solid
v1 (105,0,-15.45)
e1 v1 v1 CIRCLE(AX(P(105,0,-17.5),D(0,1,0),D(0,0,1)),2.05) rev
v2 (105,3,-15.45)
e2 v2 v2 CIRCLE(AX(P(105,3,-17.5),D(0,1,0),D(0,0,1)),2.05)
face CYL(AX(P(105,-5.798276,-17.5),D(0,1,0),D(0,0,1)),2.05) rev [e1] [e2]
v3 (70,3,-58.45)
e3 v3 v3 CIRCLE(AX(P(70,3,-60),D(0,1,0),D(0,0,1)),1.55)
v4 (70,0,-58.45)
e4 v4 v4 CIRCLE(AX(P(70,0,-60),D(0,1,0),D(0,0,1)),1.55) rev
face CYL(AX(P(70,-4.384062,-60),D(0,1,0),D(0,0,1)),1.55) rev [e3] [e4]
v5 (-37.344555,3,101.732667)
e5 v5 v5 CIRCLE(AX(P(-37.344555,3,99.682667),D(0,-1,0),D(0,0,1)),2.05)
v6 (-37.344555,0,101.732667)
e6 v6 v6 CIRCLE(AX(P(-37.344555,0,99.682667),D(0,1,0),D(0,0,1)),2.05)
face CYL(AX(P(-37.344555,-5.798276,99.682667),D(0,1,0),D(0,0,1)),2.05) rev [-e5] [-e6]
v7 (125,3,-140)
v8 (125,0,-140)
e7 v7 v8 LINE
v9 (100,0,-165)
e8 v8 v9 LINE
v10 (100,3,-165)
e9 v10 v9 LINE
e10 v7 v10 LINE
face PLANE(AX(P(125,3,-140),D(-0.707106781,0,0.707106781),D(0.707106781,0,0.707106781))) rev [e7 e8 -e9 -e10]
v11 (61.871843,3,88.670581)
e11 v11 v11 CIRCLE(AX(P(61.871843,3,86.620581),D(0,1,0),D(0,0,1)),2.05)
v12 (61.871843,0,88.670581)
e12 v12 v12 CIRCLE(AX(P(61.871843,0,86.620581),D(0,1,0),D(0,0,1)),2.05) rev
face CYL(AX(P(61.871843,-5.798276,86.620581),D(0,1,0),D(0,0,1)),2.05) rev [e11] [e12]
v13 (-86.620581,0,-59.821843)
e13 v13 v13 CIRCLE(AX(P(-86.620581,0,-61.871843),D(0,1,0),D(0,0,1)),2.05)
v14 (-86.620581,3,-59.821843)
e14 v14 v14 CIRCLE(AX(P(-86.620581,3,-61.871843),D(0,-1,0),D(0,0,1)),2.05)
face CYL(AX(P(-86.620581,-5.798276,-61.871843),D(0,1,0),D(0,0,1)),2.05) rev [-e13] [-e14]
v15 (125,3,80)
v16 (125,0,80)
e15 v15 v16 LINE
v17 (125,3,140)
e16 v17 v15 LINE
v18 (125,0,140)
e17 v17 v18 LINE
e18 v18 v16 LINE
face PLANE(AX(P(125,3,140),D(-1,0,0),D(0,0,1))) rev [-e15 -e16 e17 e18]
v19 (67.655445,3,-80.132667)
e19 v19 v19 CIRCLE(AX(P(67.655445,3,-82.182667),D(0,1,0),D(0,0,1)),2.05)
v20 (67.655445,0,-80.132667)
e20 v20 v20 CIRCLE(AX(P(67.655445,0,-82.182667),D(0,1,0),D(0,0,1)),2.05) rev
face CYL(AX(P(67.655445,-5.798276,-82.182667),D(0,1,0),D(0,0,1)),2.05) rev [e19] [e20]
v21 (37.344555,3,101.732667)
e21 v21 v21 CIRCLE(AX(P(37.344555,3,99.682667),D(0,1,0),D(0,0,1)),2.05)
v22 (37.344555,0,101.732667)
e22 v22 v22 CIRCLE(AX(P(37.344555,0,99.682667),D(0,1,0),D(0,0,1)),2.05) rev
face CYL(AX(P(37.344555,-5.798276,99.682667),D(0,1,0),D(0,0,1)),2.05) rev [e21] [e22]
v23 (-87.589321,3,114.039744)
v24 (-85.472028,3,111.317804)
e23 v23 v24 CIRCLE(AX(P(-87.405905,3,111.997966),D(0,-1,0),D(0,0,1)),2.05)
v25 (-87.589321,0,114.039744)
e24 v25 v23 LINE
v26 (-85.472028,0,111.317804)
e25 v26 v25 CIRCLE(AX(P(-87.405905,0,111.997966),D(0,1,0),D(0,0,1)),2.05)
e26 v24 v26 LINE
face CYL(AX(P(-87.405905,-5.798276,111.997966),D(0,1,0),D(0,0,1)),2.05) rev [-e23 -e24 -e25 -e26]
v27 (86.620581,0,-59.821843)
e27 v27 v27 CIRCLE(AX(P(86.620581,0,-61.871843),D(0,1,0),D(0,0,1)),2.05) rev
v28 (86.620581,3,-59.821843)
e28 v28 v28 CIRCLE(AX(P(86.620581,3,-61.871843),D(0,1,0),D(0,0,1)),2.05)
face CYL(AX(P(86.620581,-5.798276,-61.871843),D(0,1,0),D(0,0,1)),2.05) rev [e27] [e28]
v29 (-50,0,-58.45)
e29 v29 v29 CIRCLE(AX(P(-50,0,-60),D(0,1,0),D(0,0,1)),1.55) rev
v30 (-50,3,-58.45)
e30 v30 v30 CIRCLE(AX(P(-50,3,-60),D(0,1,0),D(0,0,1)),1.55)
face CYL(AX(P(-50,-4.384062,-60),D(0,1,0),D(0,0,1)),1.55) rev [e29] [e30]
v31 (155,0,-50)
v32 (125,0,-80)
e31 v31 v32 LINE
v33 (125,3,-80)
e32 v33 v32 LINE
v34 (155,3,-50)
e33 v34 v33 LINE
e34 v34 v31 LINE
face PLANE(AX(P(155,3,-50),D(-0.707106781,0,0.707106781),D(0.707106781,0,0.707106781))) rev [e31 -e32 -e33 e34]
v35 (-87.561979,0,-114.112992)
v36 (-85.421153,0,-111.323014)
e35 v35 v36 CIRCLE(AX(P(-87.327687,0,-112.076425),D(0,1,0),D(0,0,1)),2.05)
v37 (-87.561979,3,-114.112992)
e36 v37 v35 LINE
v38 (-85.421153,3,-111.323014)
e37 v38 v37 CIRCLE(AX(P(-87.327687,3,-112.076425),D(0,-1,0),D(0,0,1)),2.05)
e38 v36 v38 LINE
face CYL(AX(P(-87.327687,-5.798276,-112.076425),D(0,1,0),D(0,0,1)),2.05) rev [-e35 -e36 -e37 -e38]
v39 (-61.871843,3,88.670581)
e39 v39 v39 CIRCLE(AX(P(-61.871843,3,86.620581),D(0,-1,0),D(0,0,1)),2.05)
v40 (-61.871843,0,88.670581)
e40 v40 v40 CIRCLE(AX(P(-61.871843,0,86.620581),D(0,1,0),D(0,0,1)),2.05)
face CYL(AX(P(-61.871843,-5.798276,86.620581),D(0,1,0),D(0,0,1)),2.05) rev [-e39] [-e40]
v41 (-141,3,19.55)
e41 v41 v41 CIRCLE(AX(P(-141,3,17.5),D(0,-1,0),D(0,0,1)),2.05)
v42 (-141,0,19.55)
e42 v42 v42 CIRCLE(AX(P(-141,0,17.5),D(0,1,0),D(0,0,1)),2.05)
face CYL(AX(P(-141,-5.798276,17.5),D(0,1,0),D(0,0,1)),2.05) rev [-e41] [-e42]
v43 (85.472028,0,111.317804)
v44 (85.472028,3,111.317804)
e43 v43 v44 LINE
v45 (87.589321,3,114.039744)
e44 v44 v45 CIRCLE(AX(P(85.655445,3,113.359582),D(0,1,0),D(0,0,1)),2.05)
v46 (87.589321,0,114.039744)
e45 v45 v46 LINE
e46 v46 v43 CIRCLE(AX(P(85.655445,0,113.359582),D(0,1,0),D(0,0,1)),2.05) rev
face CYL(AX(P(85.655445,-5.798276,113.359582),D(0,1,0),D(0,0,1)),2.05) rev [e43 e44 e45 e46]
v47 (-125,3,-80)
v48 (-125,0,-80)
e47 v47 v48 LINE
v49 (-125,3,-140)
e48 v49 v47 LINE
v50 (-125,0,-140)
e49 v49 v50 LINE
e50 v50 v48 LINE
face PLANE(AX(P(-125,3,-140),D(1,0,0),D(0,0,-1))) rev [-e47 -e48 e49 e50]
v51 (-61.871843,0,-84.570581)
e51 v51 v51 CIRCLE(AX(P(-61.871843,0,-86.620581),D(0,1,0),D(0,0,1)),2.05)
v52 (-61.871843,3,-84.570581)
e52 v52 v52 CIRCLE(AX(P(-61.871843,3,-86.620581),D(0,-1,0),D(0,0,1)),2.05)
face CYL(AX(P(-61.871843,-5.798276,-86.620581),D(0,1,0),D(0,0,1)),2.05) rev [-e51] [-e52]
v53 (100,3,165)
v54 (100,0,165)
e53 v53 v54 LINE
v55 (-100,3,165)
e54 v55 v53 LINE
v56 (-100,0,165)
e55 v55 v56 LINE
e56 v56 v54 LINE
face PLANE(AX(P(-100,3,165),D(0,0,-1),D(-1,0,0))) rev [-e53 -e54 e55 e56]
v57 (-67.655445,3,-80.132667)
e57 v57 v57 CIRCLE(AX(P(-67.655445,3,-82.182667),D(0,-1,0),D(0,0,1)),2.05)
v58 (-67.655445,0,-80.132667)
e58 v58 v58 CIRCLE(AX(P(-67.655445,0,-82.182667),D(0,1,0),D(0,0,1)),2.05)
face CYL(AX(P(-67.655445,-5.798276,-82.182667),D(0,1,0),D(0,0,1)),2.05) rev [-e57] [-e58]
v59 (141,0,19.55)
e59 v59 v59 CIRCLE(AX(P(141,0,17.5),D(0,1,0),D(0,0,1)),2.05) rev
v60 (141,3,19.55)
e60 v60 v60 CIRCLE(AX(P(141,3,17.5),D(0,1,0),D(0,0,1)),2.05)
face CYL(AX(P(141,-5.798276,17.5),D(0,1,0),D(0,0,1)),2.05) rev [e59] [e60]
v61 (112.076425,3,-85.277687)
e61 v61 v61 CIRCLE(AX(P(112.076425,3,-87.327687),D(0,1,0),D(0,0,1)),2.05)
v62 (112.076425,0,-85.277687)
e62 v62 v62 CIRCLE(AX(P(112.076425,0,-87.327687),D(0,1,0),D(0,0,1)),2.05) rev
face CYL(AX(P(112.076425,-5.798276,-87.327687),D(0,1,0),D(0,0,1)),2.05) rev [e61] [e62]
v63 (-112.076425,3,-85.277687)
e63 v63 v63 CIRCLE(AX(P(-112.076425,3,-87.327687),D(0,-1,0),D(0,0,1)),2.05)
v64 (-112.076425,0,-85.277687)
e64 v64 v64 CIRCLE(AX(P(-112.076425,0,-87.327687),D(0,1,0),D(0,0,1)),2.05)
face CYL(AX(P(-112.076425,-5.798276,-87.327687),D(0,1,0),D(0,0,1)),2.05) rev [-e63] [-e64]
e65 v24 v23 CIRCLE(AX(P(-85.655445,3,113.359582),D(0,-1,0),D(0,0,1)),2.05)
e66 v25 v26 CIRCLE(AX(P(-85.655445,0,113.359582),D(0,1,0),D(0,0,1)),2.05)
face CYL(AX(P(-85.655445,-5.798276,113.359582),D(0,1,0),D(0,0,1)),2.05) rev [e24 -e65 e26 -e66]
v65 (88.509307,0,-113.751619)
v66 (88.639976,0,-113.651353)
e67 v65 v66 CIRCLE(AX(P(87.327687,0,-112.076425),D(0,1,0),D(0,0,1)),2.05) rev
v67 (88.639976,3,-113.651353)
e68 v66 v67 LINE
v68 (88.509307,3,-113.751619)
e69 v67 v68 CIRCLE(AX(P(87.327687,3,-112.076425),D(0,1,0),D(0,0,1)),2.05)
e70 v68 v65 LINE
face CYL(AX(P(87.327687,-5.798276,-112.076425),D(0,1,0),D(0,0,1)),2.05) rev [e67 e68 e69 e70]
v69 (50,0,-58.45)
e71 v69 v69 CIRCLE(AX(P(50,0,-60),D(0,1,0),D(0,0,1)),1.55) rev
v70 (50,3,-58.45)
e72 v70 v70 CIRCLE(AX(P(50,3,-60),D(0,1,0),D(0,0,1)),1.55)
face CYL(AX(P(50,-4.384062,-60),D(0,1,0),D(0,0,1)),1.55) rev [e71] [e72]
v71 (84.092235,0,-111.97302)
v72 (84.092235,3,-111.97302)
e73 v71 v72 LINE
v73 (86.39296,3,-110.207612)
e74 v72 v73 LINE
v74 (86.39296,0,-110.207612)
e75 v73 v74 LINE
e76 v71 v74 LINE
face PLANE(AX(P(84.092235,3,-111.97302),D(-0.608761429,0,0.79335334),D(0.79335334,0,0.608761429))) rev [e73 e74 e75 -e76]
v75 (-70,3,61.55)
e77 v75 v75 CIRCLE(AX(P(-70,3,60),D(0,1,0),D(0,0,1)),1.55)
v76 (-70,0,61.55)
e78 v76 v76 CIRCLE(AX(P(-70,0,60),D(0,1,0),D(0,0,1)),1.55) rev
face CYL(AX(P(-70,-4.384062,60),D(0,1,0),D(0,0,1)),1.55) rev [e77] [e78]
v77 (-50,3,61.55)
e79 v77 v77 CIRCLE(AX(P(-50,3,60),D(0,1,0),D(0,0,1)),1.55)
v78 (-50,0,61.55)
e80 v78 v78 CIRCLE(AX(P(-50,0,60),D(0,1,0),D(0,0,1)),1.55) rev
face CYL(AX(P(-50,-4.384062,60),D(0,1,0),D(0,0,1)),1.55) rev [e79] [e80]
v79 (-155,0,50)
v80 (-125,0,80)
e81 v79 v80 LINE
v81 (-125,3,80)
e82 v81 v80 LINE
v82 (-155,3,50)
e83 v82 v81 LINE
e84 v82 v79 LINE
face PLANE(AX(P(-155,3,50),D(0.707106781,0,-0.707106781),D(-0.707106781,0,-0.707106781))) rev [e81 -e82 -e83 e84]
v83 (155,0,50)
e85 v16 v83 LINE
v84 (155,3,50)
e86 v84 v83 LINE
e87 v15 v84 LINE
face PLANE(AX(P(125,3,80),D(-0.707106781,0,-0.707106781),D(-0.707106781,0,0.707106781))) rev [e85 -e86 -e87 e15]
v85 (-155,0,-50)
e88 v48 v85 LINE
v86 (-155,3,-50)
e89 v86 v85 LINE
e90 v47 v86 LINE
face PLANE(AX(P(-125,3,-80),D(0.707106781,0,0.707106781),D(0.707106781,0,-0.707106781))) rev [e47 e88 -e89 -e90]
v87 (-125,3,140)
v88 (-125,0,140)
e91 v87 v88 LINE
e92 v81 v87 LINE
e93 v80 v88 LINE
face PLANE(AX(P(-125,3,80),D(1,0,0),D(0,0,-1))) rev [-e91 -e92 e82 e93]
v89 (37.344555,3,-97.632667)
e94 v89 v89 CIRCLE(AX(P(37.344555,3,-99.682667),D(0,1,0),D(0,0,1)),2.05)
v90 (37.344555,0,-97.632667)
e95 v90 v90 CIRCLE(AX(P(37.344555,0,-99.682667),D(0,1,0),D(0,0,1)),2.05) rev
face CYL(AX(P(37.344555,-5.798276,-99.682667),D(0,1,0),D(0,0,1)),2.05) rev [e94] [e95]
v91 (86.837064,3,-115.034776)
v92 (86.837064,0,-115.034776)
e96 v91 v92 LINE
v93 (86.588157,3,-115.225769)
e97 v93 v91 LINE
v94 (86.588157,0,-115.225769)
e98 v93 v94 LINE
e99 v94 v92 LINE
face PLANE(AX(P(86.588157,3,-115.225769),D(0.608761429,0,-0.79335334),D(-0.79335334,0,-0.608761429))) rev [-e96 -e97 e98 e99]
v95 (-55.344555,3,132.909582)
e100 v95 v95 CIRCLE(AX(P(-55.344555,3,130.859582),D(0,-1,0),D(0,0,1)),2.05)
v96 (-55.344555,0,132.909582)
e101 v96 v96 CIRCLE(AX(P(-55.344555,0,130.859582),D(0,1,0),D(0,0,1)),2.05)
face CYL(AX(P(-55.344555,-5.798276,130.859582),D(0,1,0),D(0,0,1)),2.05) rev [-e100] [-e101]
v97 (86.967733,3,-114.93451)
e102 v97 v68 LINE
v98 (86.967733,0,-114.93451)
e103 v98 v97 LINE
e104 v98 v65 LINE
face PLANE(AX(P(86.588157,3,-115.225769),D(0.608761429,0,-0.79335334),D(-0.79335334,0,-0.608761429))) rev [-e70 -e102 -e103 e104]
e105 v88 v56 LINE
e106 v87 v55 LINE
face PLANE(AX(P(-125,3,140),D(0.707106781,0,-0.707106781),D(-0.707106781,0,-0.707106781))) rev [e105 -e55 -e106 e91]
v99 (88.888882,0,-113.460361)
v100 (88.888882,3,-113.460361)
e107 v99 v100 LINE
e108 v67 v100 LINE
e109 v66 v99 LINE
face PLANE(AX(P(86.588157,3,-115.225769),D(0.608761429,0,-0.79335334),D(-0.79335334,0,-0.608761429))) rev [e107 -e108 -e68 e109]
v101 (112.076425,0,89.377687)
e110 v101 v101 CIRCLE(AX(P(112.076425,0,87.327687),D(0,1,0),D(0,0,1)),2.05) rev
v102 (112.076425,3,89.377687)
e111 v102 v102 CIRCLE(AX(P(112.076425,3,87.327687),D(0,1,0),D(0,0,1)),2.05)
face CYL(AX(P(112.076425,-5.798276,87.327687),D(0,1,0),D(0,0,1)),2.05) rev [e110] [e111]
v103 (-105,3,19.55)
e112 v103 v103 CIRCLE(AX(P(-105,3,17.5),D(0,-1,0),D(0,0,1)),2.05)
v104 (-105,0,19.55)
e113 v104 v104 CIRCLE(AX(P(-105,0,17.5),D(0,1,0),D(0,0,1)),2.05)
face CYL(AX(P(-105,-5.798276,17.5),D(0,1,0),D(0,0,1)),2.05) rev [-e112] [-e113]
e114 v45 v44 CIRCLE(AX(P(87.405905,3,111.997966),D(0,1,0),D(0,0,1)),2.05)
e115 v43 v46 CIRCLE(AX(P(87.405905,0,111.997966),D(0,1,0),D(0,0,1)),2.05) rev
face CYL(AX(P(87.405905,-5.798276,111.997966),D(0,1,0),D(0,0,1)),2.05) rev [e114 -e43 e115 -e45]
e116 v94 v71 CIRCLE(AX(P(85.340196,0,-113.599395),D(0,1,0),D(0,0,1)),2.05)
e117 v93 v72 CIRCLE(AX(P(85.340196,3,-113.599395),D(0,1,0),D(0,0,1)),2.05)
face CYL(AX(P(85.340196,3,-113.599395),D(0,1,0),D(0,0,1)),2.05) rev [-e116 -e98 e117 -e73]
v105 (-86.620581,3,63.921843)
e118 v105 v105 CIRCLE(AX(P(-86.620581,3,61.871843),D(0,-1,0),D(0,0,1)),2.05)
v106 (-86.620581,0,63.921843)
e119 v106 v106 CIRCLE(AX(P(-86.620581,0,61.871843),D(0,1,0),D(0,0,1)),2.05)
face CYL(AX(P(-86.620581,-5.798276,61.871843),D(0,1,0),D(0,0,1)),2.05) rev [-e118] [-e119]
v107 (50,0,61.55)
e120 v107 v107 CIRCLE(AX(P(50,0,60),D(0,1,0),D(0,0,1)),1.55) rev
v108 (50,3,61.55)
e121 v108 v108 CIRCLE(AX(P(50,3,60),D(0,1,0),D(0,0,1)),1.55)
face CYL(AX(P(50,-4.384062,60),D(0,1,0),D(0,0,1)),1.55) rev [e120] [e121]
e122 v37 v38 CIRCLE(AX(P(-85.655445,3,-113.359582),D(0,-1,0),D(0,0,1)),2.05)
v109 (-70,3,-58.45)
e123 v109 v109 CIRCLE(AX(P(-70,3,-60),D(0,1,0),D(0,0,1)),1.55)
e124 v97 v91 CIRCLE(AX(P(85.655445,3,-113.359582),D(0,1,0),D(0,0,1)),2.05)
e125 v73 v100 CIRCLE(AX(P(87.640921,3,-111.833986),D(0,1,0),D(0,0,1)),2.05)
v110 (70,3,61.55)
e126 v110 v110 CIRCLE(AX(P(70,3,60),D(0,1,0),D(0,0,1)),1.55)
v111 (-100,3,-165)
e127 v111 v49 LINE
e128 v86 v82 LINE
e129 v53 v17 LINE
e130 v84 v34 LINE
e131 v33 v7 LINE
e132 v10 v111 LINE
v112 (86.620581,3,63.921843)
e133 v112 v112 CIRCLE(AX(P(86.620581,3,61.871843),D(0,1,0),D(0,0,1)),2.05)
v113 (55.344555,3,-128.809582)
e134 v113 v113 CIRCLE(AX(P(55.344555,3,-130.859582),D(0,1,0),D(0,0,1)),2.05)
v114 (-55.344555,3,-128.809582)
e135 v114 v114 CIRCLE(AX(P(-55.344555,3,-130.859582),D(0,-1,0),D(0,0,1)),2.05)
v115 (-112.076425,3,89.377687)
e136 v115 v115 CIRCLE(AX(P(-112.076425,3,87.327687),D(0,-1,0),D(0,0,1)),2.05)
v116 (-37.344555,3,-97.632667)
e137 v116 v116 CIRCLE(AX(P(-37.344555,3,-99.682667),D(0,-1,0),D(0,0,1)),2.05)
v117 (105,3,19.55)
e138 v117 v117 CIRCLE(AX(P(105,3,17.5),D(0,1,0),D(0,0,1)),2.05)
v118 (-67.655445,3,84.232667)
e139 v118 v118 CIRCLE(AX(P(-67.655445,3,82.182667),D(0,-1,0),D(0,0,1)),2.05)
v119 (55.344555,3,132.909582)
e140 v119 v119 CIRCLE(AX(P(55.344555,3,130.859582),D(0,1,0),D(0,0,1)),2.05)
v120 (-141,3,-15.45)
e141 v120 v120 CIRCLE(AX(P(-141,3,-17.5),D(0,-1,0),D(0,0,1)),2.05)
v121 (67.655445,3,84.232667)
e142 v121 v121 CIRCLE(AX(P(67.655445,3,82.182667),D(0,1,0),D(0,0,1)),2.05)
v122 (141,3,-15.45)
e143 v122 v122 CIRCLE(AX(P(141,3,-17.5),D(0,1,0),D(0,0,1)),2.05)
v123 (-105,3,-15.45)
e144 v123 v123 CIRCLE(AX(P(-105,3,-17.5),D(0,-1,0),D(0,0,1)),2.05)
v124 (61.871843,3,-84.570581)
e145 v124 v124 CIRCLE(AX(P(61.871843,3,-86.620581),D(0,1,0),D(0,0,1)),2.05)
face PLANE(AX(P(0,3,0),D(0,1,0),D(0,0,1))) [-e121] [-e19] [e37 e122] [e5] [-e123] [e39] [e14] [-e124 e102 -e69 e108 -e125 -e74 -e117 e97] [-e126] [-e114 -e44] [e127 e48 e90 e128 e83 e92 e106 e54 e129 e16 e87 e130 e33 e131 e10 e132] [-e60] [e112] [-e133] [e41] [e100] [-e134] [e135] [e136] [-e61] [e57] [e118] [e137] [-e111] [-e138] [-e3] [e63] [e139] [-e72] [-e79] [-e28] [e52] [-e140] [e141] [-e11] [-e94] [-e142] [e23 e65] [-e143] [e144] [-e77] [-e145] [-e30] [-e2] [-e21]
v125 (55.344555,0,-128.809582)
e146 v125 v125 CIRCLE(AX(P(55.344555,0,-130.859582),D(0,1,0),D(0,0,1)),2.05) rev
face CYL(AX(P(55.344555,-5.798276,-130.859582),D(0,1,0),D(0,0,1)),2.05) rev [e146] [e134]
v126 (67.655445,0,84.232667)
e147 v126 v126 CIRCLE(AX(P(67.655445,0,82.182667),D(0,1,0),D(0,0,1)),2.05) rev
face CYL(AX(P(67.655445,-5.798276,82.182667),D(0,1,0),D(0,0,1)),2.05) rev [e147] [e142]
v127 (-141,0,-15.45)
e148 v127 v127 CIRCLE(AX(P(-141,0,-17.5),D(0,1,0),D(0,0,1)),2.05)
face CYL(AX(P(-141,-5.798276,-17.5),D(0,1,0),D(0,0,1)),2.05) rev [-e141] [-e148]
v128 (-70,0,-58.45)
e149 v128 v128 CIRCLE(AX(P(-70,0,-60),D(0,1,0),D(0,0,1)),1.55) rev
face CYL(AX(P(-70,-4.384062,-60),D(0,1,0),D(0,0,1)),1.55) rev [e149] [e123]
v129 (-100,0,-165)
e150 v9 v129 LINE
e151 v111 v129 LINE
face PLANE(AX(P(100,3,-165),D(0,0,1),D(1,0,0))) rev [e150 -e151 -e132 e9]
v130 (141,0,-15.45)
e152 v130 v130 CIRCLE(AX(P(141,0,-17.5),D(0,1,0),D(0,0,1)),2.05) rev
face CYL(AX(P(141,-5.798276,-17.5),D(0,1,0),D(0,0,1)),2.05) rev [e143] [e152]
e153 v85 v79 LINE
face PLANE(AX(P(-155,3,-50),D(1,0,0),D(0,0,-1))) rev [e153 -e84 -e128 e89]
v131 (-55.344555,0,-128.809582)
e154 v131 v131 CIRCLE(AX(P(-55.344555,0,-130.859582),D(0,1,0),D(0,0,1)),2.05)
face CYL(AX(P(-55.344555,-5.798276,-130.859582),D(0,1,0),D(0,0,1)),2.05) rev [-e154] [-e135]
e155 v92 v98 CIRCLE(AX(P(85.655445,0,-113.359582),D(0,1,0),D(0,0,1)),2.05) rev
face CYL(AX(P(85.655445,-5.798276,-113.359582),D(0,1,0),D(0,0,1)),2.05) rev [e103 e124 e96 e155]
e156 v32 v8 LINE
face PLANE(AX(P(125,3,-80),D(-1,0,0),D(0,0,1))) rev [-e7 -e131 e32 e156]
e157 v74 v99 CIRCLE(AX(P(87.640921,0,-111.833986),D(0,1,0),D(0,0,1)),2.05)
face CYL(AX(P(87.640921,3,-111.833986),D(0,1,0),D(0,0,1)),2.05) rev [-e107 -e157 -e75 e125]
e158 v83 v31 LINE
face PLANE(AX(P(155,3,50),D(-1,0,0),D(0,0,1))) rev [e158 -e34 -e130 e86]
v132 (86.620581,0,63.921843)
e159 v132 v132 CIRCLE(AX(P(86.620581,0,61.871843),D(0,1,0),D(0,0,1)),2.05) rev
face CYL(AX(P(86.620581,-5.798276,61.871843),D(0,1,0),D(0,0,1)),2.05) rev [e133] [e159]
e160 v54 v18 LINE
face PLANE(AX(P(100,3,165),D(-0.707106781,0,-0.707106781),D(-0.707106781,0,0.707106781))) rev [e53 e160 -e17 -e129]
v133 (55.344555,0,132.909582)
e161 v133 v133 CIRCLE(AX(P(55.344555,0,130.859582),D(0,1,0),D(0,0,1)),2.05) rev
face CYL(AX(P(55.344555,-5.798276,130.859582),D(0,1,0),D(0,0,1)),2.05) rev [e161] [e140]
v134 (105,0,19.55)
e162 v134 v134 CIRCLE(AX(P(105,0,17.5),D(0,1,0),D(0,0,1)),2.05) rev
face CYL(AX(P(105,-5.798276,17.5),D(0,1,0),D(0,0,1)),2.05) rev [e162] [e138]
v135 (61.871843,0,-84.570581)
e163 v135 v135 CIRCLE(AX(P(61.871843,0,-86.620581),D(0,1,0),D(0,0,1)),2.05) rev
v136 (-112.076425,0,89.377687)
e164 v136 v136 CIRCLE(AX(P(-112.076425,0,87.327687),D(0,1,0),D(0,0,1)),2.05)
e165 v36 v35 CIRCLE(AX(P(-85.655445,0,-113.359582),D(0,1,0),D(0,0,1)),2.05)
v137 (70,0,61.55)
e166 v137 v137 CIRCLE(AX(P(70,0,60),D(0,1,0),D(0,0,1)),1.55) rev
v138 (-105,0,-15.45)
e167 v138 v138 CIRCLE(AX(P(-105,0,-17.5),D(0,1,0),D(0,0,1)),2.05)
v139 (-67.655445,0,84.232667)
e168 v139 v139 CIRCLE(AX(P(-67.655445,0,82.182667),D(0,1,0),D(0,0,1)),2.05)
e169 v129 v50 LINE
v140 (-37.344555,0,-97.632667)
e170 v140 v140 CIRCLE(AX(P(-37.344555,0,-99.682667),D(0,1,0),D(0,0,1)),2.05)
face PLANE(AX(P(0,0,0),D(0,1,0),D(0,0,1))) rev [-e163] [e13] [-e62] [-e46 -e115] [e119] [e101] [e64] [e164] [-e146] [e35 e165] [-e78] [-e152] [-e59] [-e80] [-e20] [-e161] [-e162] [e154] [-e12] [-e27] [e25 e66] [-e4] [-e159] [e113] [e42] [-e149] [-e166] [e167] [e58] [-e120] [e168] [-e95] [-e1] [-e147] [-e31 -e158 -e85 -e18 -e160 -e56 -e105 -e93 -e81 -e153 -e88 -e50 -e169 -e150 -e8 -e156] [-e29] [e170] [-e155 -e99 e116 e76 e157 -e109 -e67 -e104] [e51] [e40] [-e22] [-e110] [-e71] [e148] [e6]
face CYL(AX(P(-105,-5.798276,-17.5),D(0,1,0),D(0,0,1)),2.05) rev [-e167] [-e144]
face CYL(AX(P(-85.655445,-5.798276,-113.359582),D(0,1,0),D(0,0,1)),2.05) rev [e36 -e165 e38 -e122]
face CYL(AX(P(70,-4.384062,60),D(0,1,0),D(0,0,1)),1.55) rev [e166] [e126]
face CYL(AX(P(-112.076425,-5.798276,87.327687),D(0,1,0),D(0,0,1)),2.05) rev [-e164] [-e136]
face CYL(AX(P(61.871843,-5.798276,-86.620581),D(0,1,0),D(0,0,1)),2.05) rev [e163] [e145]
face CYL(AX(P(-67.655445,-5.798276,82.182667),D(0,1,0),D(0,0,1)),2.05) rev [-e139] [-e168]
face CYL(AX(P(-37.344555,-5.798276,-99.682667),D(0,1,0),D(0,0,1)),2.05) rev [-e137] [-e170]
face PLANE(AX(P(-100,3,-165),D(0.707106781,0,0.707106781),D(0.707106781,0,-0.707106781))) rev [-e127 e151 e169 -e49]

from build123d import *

# Parameters (mm, degrees)
BOSS_EXTRUDE1_DEPTH            = 3
SKETCH2_R                      = 2.05
CUT_EXTRUDE1_DEPTH             = 3
SKETCH5_R                      = 1.55
CUT_EXTRUDE2_DEPTH             = 3
LPATTERN1_COUNT                = 2
LPATTERN1_PITCH                = 120
LPATTERN1_COUNT_DIR2           = 2
LPATTERN1_PITCH_DIR2           = 120
SKETCH6_R                      = 2.05
CUT_EXTRUDE3_DEPTH             = 3
F_4_1_4_1_DIAMETER_SLOT1_DEPTH = 3


# Read off the part's stored shape, not the designer's step: Ø4.1 (4.1) Diameter Slot1
with BuildPart() as part:
    # Sketch1 → Boss-Extrude1 (new body)
    with BuildSketch(Plane(origin=(0, 0, 0), x_dir=(1, 0, 0), z_dir=(0, 1, 0))):
        Polygon((-100, 165), (-125, 140), (-125, 80), (-155, 50), (-155, -50), (-125, -80), (-125, -140), (-100, -165), (100, -165), (125, -140), (125, -80), (155, -50), (155, 50), (125, 80), (125, 140), (100, 165), align=None)
    extrude(amount=BOSS_EXTRUDE1_DEPTH)

    # Sketch2 → Cut-Extrude1 (cut)
    with BuildSketch(Plane(origin=(0, 3, 0), x_dir=(1, 0, 0), z_dir=(0, 1, 0))):
        with Locations(Location((55.344555434, 130.859581934, 0), (0, 0, 270))):
            Circle(SKETCH2_R)
        with Locations(Location((37.344555434, 99.682667397, 0), (0, 0, 270))):
            Circle(SKETCH2_R)
        with Locations(Location((37.344555434, -99.682667397, 0), (0, 0, 270))):
            Circle(SKETCH2_R)
        with Locations(Location((55.344555434, -130.859581934, 0), (0, 0, 270))):
            Circle(SKETCH2_R)
        with Locations(Location((105, 17.5, 0), (0, 0, 270))):
            Circle(SKETCH2_R)
        with Locations(Location((141, 17.5, 0), (0, 0, 270))):
            Circle(SKETCH2_R)
        with Locations(Location((105, -17.5, 0), (0, 0, 270))):
            Circle(SKETCH2_R)
        with Locations(Location((141, -17.5, 0), (0, 0, 270))):
            Circle(SKETCH2_R)
        with Locations(Location((85.655444566, -113.359581934, 0), (0, 0, 270))):
            Circle(SKETCH2_R)
        with Locations(Location((67.655444566, -82.182667397, 0), (0, 0, 270))):
            Circle(SKETCH2_R)
        with Locations(Location((85.655444566, 113.359581934, 0), (0, 0, 270))):
            Circle(SKETCH2_R)
        with Locations(Location((67.655444566, 82.182667397, 0), (0, 0, 270))):
            Circle(SKETCH2_R)
    cut_extrude1 = extrude(amount=-CUT_EXTRUDE1_DEPTH, mode=Mode.SUBTRACT)

    # Mirror1: Cut-Extrude1 across plane
    add(cut_extrude1.mirror(Plane(origin=(0, 0, 0), x_dir=(0, 0, 1), z_dir=(1, 0, 0))), mode=Mode.SUBTRACT)

    # Sketch5 → Cut-Extrude2 (cut)
    with BuildSketch(Plane(origin=(0, 3, 0), x_dir=(1, 0, 0), z_dir=(0, 1, 0))):
        with Locations(Location((50, 60, 0), (0, 0, 270))):
            Circle(SKETCH5_R)
        with Locations(Location((70, 60, 0), (0, 0, 270))):
            Circle(SKETCH5_R)
    cut_extrude2 = extrude(amount=-CUT_EXTRUDE2_DEPTH, mode=Mode.SUBTRACT)

    # LPattern1: Cut-Extrude2 2 × 2
    with Locations(*[(-j * LPATTERN1_PITCH_DIR2, 0, i * LPATTERN1_PITCH) for i in range(LPATTERN1_COUNT) for j in range(LPATTERN1_COUNT_DIR2) if (i, j) != (0, 0)]):
        add(cut_extrude2, mode=Mode.SUBTRACT)

    # Sketch6 → Cut-Extrude3 (cut)
    with BuildSketch(Plane(origin=(0, 3, 0), x_dir=(1, 0, 0), z_dir=(0, 1, 0))):
        with Locations(Location((86.620580695, 61.871843354, 0), (0, 0, 270))):
            Circle(SKETCH6_R)
        with Locations(Location((112.076424818, 87.327687477, 0), (0, 0, 270))):
            Circle(SKETCH6_R)
        with Locations((87.327687477, 112.076424818)):
            Circle(SKETCH6_R)
        with Locations(Location((61.871843354, 86.620580695, 0), (0, 0, 270))):
            Circle(SKETCH6_R)
        with Locations(Location((86.620580695, -61.871843354, 0), (0, 0, 270))):
            Circle(SKETCH6_R)
        with Locations(Location((61.871843354, -86.620580695, 0), (0, 0, 270))):
            Circle(SKETCH6_R)
        with Locations((87.405904998, -111.997966218)):
            Circle(SKETCH6_R)
        with Locations(Location((112.076424818, -87.327687477, 0), (0, 0, 270))):
            Circle(SKETCH6_R)
    cut_extrude3 = extrude(amount=-CUT_EXTRUDE3_DEPTH, mode=Mode.SUBTRACT)

    # Mirror3: Cut-Extrude3 across plane
    add(cut_extrude3.mirror(Plane(origin=(0, 0, 0), x_dir=(0, 0, 1), z_dir=(1, 0, 0))), mode=Mode.SUBTRACT)

    # Ø4.1 (4.1) Diameter Slot1 outline → Ø4.1 (4.1) Diameter Slot1 (cut)
    with BuildSketch(Plane(origin=(0, 0, 0), x_dir=(1, 0, 0), z_dir=(0, 1, 0))):
        with BuildLine():
            Line((86.83706359, 115.034776395), (86.588157233, 115.22576896))
            ThreePointArc((86.588157233, 115.22576896), (83.713821956, 114.847355542), (84.092235374, 111.973020265))
            Line((84.092235374, 111.973020265), (86.392960061, 110.207612121))
            ThreePointArc((86.392960061, 110.207612121), (89.267295338, 110.586025539), (88.88888192, 113.460360816))
            Line((88.88888192, 113.460360816), (88.639975563, 113.651353381))
            ThreePointArc((88.639975563, 113.651353381), (88.529175217, 110.415422949), (85.421153281, 111.323014333))
            ThreePointArc((85.421153281, 111.323014333), (83.740072054, 114.090231054), (86.83706359, 115.034776395))
        make_face()
        with BuildLine():
            Line((88.5093065, 113.751619279), (86.967732653, 114.934510496))
            ThreePointArc((86.967732653, 114.934510496), (87.316446435, 114.561069674), (87.561978762, 114.112992419))
            ThreePointArc((87.561978762, 114.112992419), (88.058336597, 113.991797331), (88.5093065, 113.751619279))
        make_face()
    extrude(amount=F_4_1_4_1_DIAMETER_SLOT1_DEPTH, mode=Mode.SUBTRACT)


solid = part.part
